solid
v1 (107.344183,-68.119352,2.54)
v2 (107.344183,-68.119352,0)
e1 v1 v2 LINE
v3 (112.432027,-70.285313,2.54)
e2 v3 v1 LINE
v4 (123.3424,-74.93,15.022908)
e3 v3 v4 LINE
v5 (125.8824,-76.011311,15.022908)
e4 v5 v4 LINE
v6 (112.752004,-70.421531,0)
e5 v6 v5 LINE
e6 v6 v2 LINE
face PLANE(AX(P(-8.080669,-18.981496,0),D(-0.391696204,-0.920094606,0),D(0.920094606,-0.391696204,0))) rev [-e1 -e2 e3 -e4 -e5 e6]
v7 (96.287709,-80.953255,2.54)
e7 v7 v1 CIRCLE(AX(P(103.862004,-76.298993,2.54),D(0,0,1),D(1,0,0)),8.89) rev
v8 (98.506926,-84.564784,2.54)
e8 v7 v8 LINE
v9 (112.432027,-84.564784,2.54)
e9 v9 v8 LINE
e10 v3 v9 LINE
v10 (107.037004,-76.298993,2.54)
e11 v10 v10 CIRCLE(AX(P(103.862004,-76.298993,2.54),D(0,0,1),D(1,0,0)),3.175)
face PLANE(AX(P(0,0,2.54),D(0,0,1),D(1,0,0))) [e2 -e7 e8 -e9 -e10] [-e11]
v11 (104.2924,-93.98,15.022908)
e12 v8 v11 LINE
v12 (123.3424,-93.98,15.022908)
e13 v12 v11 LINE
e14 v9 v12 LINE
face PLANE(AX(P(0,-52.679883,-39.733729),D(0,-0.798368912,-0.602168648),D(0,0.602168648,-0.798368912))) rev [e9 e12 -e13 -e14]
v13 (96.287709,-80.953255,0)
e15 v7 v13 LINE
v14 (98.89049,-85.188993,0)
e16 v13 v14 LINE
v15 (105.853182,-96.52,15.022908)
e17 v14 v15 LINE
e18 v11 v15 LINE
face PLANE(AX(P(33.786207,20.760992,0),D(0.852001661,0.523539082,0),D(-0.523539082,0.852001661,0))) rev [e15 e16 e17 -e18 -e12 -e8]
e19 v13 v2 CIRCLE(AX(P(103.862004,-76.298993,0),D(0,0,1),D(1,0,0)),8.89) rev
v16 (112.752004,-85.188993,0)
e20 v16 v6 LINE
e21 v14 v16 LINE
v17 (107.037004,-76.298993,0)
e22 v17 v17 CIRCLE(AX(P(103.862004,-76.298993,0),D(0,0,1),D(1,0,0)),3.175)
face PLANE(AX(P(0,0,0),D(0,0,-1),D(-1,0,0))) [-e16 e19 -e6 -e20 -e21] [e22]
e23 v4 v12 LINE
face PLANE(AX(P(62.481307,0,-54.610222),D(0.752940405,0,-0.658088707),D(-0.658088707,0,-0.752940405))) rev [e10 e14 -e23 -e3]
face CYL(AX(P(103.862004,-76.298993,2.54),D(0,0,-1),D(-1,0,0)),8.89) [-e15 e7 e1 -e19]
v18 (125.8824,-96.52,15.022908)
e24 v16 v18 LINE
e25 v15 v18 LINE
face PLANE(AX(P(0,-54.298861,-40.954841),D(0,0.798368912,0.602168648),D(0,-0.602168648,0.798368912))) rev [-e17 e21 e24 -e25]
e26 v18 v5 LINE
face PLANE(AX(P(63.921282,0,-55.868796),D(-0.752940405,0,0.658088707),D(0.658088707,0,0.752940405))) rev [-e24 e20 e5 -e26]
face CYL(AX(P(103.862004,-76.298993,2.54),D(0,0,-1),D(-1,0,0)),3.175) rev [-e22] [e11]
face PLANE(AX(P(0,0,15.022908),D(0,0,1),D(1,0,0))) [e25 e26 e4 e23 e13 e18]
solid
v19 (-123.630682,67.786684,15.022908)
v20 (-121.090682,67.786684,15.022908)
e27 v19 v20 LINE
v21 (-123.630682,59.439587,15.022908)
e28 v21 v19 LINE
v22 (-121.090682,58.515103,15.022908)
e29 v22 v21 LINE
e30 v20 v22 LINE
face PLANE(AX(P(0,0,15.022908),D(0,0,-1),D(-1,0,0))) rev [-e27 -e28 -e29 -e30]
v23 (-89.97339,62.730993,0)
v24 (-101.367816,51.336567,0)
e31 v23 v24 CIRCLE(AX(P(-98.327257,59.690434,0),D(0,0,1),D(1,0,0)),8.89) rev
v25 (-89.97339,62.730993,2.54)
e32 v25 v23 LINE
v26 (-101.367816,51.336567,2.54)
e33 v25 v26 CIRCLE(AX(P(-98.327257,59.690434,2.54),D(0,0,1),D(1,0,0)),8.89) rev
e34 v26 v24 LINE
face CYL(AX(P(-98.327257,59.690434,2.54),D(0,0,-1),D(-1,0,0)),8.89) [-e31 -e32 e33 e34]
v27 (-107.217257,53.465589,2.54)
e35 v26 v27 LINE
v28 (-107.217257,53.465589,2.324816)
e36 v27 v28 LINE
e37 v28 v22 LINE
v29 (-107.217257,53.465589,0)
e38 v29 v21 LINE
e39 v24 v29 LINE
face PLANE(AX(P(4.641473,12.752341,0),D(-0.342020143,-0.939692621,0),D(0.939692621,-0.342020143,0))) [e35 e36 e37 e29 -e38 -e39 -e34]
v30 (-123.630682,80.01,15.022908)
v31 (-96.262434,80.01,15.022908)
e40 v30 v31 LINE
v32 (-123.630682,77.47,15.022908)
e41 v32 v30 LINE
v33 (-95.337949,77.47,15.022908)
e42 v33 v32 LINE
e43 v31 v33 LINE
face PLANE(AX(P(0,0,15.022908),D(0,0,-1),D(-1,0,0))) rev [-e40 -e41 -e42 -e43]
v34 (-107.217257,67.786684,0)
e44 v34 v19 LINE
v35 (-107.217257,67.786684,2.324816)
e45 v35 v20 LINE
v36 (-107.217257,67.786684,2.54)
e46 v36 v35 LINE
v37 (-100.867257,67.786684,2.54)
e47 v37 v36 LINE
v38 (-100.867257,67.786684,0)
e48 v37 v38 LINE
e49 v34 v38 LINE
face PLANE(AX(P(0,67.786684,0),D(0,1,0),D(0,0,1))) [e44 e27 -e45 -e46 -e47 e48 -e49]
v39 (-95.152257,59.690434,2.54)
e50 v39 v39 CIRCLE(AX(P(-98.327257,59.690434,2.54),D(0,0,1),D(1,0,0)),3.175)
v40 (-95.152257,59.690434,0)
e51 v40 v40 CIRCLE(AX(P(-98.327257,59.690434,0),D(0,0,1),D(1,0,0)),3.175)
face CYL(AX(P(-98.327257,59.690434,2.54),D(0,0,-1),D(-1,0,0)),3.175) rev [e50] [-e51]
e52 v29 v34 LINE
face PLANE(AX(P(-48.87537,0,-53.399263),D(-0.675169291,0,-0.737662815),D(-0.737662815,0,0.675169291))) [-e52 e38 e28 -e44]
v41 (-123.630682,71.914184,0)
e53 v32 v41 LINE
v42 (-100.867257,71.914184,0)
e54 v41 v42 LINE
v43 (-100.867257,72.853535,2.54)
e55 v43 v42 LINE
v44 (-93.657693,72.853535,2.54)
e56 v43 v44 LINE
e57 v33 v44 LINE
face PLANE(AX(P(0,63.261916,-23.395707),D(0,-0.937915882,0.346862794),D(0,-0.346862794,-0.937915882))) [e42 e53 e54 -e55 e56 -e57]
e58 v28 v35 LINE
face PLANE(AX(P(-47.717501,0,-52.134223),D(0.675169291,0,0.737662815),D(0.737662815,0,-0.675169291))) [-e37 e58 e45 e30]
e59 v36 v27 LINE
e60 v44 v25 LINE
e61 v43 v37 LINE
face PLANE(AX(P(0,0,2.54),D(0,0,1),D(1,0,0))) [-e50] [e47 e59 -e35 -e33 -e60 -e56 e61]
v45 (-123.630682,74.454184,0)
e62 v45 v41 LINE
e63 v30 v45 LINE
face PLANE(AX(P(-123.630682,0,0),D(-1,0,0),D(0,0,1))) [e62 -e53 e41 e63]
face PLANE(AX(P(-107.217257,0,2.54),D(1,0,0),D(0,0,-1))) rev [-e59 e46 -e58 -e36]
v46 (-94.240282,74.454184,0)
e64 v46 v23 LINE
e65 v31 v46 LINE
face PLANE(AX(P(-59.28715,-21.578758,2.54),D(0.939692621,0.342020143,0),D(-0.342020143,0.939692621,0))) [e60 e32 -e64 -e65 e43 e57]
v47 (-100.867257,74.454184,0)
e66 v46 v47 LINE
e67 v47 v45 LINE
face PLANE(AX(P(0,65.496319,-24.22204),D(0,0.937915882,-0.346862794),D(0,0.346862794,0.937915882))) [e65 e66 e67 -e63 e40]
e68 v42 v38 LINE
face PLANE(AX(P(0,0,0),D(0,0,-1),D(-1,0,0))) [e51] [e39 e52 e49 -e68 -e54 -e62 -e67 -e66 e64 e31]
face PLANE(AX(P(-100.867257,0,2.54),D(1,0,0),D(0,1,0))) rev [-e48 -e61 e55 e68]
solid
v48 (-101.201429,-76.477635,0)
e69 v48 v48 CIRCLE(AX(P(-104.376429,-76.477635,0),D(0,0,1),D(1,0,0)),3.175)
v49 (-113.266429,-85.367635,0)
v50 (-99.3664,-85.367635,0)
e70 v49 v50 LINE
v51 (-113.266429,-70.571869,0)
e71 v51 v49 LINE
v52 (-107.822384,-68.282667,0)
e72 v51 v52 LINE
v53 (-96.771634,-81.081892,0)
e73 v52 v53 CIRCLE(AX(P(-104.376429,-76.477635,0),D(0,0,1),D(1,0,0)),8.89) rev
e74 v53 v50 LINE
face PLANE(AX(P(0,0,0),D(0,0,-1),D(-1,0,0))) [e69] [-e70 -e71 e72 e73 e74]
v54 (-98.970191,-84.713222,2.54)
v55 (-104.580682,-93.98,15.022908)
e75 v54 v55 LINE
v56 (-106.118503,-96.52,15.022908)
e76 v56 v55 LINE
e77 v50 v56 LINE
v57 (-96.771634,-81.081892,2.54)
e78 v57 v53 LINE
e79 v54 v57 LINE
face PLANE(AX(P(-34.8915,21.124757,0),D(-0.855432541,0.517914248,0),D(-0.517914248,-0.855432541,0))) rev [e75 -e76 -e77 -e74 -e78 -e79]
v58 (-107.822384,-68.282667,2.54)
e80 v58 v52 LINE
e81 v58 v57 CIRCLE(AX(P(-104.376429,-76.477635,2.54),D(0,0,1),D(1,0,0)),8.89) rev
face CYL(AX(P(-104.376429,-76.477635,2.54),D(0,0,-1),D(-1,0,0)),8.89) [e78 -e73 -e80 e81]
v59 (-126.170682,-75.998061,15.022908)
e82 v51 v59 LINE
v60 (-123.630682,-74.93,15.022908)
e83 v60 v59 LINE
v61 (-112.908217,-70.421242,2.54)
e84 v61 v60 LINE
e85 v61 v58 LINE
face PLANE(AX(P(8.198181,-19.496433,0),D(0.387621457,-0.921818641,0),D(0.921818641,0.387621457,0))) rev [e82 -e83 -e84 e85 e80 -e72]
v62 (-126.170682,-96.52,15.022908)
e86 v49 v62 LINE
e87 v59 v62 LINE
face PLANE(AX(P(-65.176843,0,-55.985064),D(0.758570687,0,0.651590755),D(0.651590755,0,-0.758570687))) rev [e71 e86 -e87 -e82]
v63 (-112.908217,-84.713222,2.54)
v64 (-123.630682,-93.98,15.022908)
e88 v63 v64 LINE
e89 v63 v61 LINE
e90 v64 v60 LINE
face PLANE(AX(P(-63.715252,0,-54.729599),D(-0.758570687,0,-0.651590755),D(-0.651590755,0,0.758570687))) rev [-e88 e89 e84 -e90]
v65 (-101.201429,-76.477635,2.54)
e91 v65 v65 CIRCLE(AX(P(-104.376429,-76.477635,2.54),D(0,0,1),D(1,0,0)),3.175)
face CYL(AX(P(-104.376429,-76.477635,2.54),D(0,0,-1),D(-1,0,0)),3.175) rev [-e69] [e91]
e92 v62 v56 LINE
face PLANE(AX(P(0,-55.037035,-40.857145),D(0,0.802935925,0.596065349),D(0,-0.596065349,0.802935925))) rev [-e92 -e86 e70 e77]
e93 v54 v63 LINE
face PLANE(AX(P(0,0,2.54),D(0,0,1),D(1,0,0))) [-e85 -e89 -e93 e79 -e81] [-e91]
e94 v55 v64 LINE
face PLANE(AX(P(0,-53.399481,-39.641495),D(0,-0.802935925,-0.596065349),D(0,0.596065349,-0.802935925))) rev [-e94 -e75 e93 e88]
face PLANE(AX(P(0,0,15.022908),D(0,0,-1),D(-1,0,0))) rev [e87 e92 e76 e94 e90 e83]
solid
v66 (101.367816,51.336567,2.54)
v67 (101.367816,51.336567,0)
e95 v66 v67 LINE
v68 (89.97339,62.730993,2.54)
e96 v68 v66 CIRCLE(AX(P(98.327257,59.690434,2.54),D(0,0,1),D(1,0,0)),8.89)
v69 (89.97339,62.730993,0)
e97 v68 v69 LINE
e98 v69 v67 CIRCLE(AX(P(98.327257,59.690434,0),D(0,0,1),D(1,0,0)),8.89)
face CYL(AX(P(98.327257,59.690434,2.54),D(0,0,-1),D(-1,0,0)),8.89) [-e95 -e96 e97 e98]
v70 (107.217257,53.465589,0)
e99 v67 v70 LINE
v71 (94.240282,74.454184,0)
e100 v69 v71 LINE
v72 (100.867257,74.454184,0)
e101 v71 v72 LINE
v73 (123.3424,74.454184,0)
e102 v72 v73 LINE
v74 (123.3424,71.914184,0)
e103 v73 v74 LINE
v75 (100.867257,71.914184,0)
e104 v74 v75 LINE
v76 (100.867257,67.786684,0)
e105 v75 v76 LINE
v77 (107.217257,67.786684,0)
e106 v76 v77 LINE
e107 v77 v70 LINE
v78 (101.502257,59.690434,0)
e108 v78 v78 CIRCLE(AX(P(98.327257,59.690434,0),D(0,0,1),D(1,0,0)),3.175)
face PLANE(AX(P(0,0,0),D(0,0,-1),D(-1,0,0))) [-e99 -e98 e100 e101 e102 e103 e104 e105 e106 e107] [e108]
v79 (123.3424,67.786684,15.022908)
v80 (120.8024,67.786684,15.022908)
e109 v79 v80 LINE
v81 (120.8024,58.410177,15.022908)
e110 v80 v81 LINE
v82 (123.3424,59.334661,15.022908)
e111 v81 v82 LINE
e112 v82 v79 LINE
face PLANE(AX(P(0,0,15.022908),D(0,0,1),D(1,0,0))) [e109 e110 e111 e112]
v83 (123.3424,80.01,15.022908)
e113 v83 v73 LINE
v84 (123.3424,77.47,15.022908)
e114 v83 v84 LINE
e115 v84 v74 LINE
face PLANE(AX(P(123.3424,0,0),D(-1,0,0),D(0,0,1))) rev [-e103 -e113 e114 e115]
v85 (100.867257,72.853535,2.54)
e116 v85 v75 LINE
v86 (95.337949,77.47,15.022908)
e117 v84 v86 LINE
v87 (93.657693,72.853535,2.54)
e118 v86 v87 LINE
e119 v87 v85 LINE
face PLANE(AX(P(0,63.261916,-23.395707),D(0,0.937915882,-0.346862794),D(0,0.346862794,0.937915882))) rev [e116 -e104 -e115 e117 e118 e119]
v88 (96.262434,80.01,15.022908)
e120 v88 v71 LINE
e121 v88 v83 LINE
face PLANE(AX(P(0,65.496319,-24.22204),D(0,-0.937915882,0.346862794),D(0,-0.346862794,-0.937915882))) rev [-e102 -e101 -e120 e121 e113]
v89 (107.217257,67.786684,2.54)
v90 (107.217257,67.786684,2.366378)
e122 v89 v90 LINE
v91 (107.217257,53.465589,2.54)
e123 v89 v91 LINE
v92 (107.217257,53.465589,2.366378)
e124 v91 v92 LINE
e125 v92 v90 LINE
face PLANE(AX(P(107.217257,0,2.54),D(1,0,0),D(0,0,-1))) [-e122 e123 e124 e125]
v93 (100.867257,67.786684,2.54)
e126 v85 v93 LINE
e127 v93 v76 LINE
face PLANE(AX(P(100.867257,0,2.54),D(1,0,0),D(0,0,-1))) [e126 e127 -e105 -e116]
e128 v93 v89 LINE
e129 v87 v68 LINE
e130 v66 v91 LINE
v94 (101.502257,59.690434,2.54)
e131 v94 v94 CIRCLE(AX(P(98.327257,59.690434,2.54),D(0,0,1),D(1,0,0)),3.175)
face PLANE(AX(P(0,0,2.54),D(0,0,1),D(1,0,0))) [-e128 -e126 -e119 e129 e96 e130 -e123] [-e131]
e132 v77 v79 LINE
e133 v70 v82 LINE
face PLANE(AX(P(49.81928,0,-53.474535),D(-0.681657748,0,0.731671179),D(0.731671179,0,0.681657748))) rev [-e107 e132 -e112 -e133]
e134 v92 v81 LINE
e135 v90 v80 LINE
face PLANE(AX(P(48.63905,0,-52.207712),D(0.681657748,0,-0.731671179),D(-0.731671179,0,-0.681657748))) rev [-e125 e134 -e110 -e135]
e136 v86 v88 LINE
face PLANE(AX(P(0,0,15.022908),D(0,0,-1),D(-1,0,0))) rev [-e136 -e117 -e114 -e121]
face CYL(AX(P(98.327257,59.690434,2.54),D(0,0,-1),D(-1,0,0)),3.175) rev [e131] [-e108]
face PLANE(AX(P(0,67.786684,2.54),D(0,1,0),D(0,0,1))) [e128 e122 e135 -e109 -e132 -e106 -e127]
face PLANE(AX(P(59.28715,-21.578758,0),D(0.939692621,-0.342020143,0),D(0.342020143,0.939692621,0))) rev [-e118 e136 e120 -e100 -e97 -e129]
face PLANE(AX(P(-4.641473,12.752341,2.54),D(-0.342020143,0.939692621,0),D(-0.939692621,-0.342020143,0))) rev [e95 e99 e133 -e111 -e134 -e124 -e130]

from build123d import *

# Parameters (mm, degrees)
SKETCH4_7_R              = 3.175
BOSS_EXTRUDE7_DEPTH      = 2.54
SKETCH4_9_R              = 3.175
BOSS_EXTRUDE8_DEPTH      = 2.54
BOSS_EXTRUDE9_OUTLINE_R  = 3.175
BOSS_EXTRUDE9_DEPTH      = 2.54
BOSS_EXTRUDE10_OUTLINE_R = 3.175
BOSS_EXTRUDE10_DEPTH     = 2.54


# Read off the part's stored shape, not the designer's step: Boss-Extrude9, Boss-Extrude10
with BuildPart() as part:
    # Sketch9 → Loft2 section 0
    with BuildSketch(Plane.XY):
        with BuildLine():
            Line((-113.266429258, -70.57186866), (-113.266429258, -85.367634727))
            Line((-113.266429258, -85.367634727), (-99.366399677, -85.367634727))
            Line((-99.366399677, -85.367634727), (-97.8285786, -82.827634727))
            Line((-97.8285786, -82.827634727), (-110.726429258, -82.827634727))
            Line((-110.726429258, -82.827634727), (-110.726429258, -69.503807701))
            Line((-110.726429258, -69.503807701), (-113.266429258, -70.57186866))
        make_face()
    # Sketch8 → Loft2 section 1
    with BuildSketch(Plane.XY.offset(15.022907724)):
        with BuildLine():
            Line((-104.580681896, -93.98), (-123.630681896, -93.98))
            Line((-123.630681896, -93.98), (-123.630681896, -74.93))
            Line((-123.630681896, -74.93), (-126.170681896, -75.998060958))
            Line((-126.170681896, -75.998060958), (-126.170681896, -96.52))
            Line((-126.170681896, -96.52), (-106.118502973, -96.52))
            Line((-106.118502973, -96.52), (-104.580681896, -93.98))
        make_face()
    loft()

    # Sketch4<7> → Boss-Extrude7 (add)
    with BuildSketch(Plane.XY):
        with BuildLine():
            Line((-107.82238401, -68.282667012), (-113.266429258, -70.57186866))
            Line((-113.266429258, -70.57186866), (-113.266429258, -85.367634727))
            Line((-113.266429258, -85.367634727), (-99.366399677, -85.367634727))
            Line((-99.366399677, -85.367634727), (-96.771633973, -81.081892394))
            ThreePointArc((-96.771633973, -81.081892394), (-97.647459705, -70.667895597), (-107.82238401, -68.282667012))
        make_face()
        with Locations((-104.376429258, -76.477634727)):
            Circle(SKETCH4_7_R, mode=Mode.SUBTRACT)
    extrude(amount=BOSS_EXTRUDE7_DEPTH)


with BuildPart() as body_2:
    # Sketch11 → Loft3 section 0
    with BuildSketch(Plane.XY):
        with BuildLine():
            Line((98.890490417, -85.188992609), (112.752003689, -85.188992609))
            Line((112.752003689, -85.188992609), (112.752003689, -70.421530974))
            Line((112.752003689, -70.421530974), (110.212003689, -69.340220039))
            Line((110.212003689, -69.340220039), (110.212003689, -82.648992609))
            Line((110.212003689, -82.648992609), (97.329707935, -82.648992609))
            Line((97.329707935, -82.648992609), (98.890490417, -85.188992609))
        make_face()
    # Sketch10 → Loft3 section 1
    with BuildSketch(Plane.XY.offset(15.022907724)):
        with BuildLine():
            Line((123.3424, -93.98), (123.3424, -74.93))
            Line((123.3424, -74.93), (125.8824, -76.011310934))
            Line((125.8824, -76.011310934), (125.8824, -96.52))
            Line((125.8824, -96.52), (105.853182483, -96.52))
            Line((105.853182483, -96.52), (104.2924, -93.98))
            Line((104.2924, -93.98), (123.3424, -93.98))
        make_face()
    loft()

    # Sketch4<9> → Boss-Extrude8 (add)
    with BuildSketch(Plane.XY):
        with BuildLine():
            ThreePointArc((107.344182942, -68.119351562), (97.126751505, -70.496538128), (96.287708925, -80.953255045))
            Line((96.287708925, -80.953255045), (98.890490417, -85.188992609))
            Line((98.890490417, -85.188992609), (112.752003689, -85.188992609))
            Line((112.752003689, -85.188992609), (112.752003689, -70.421530974))
            Line((112.752003689, -70.421530974), (107.344182942, -68.119351562))
        make_face()
        with Locations((103.862003689, -76.298992609)):
            Circle(SKETCH4_9_R, mode=Mode.SUBTRACT)
    extrude(amount=BOSS_EXTRUDE8_DEPTH)


with BuildPart() as body_3:
    # Sketch12 → Loft4 section 0
    with BuildSketch(Plane.XY.offset(15.022907724)):
        with BuildLine():
            Line((96.262433744, 80.01), (123.3424, 80.01))
            Line((123.3424, 80.01), (123.3424, 77.47))
            Line((123.3424, 77.47), (95.337949349, 77.47))
            Line((95.337949349, 77.47), (96.262433744, 80.01))
        make_face()
    # Sketch14 → Loft4 section 1
    with BuildSketch(Plane.XY):
        with BuildLine():
            Line((93.315797821, 71.91418434), (94.240282216, 74.45418434))
            Line((94.240282216, 74.45418434), (123.3424, 74.45418434))
            Line((123.3424, 74.45418434), (123.3424, 71.91418434))
            Line((123.3424, 71.91418434), (93.315797821, 71.91418434))
        make_face()
    loft()



with BuildPart() as body_4:
    # Sketch14<3> → Loft5 section 0
    with BuildSketch(Plane.XY):
        with BuildLine():
            Line((107.217257067, 67.78668434), (104.677257067, 67.78668434))
            Line((104.677257067, 67.78668434), (104.677257067, 52.54110493))
            Line((104.677257067, 52.54110493), (107.217257067, 53.465589325))
            Line((107.217257067, 53.465589325), (107.217257067, 67.78668434))
        make_face()
    # Sketch12<3> → Loft5 section 1
    with BuildSketch(Plane.XY.offset(15.022907724)):
        with BuildLine():
            Line((123.3424, 59.334661376), (123.3424, 67.78668434))
            Line((123.3424, 67.78668434), (120.8024, 67.78668434))
            Line((120.8024, 67.78668434), (120.8024, 58.410176981))
            Line((120.8024, 58.410176981), (123.3424, 59.334661376))
        make_face()
    loft()


with BuildPart() as body_3_1:
    add(body_3.part)

    add(body_4.part)  # Boss-Extrude9 merges body 4
    # Boss-Extrude9 outline → Boss-Extrude9 (add)
    with BuildSketch(Plane.XY):
        with BuildLine():
            ThreePointArc((89.973389669, 62.730993414), (92.041077783, 53.404255055), (101.367816142, 51.336566941))
            Line((101.367816142, 51.336566941), (107.217257067, 53.465589325))
            Line((107.217257067, 53.465589325), (107.217257067, 67.78668434))
            Line((107.217257067, 67.78668434), (100.867257067, 67.78668434))
            Line((100.867257067, 67.78668434), (100.867257067, 74.45418434))
            Line((100.867257067, 74.45418434), (94.240282216, 74.45418434))
            Line((94.240282216, 74.45418434), (89.973389669, 62.730993414))
        make_face()
        with Locations((98.327257067, 59.69043434)):
            Circle(BOSS_EXTRUDE9_OUTLINE_R, mode=Mode.SUBTRACT)
    extrude(amount=BOSS_EXTRUDE9_DEPTH)


with BuildPart() as body_4_2:
    # Sketch16 → Loft6 section 0
    with BuildSketch(Plane.XY):
        with BuildLine():
            Line((-104.677257067, 67.78668434), (-104.677257067, 52.54110493))
            Line((-104.677257067, 52.54110493), (-107.217257067, 53.465589325))
            Line((-107.217257067, 53.465589325), (-107.217257067, 67.78668434))
            Line((-107.217257067, 67.78668434), (-104.677257067, 67.78668434))
        make_face()
    # Sketch15 → Loft6 section 1
    with BuildSketch(Plane.XY.offset(15.022907724)):
        with BuildLine():
            Line((-123.630681896, 67.78668434), (-121.090681896, 67.78668434))
            Line((-121.090681896, 67.78668434), (-121.090681896, 58.51510301))
            Line((-121.090681896, 58.51510301), (-123.630681896, 59.439587405))
            Line((-123.630681896, 59.439587405), (-123.630681896, 67.78668434))
        make_face()
    loft()



with BuildPart() as body_5:
    # Sketch15<3> → Loft7 section 0
    with BuildSketch(Plane.XY.offset(15.022907724)):
        with BuildLine():
            Line((-123.630681896, 80.01), (-96.262433744, 80.01))
            Line((-96.262433744, 80.01), (-95.337949349, 77.47))
            Line((-95.337949349, 77.47), (-123.630681896, 77.47))
            Line((-123.630681896, 77.47), (-123.630681896, 80.01))
        make_face()
    # Sketch16<3> → Loft7 section 1
    with BuildSketch(Plane.XY):
        with BuildLine():
            Line((-93.315797821, 71.91418434), (-94.240282216, 74.45418434))
            Line((-94.240282216, 74.45418434), (-123.630681896, 74.45418434))
            Line((-123.630681896, 74.45418434), (-123.630681896, 71.91418434))
            Line((-123.630681896, 71.91418434), (-93.315797821, 71.91418434))
        make_face()
    loft()


with BuildPart() as body_4_2_1:
    add(body_4_2.part)

    add(body_5.part)  # Boss-Extrude10 merges body 5
    # Boss-Extrude10 outline → Boss-Extrude10 (add)
    with BuildSketch(Plane.XY):
        with BuildLine():
            Line((-107.217257067, 53.465589325), (-101.367816142, 51.336566941))
            ThreePointArc((-101.367816142, 51.336566941), (-92.041077783, 53.404255055), (-89.973389669, 62.730993414))
            Line((-89.973389669, 62.730993414), (-94.240282216, 74.45418434))
            Line((-94.240282216, 74.45418434), (-100.867257067, 74.45418434))
            Line((-100.867257067, 74.45418434), (-100.867257067, 67.78668434))
            Line((-100.867257067, 67.78668434), (-107.217257067, 67.78668434))
            Line((-107.217257067, 67.78668434), (-107.217257067, 53.465589325))
        make_face()
        with Locations((-98.327257067, 59.69043434)):
            Circle(BOSS_EXTRUDE10_OUTLINE_R, mode=Mode.SUBTRACT)
    extrude(amount=BOSS_EXTRUDE10_DEPTH)


solid = Compound([part.part, body_2.part, body_3_1.part, body_4_2_1.part])
